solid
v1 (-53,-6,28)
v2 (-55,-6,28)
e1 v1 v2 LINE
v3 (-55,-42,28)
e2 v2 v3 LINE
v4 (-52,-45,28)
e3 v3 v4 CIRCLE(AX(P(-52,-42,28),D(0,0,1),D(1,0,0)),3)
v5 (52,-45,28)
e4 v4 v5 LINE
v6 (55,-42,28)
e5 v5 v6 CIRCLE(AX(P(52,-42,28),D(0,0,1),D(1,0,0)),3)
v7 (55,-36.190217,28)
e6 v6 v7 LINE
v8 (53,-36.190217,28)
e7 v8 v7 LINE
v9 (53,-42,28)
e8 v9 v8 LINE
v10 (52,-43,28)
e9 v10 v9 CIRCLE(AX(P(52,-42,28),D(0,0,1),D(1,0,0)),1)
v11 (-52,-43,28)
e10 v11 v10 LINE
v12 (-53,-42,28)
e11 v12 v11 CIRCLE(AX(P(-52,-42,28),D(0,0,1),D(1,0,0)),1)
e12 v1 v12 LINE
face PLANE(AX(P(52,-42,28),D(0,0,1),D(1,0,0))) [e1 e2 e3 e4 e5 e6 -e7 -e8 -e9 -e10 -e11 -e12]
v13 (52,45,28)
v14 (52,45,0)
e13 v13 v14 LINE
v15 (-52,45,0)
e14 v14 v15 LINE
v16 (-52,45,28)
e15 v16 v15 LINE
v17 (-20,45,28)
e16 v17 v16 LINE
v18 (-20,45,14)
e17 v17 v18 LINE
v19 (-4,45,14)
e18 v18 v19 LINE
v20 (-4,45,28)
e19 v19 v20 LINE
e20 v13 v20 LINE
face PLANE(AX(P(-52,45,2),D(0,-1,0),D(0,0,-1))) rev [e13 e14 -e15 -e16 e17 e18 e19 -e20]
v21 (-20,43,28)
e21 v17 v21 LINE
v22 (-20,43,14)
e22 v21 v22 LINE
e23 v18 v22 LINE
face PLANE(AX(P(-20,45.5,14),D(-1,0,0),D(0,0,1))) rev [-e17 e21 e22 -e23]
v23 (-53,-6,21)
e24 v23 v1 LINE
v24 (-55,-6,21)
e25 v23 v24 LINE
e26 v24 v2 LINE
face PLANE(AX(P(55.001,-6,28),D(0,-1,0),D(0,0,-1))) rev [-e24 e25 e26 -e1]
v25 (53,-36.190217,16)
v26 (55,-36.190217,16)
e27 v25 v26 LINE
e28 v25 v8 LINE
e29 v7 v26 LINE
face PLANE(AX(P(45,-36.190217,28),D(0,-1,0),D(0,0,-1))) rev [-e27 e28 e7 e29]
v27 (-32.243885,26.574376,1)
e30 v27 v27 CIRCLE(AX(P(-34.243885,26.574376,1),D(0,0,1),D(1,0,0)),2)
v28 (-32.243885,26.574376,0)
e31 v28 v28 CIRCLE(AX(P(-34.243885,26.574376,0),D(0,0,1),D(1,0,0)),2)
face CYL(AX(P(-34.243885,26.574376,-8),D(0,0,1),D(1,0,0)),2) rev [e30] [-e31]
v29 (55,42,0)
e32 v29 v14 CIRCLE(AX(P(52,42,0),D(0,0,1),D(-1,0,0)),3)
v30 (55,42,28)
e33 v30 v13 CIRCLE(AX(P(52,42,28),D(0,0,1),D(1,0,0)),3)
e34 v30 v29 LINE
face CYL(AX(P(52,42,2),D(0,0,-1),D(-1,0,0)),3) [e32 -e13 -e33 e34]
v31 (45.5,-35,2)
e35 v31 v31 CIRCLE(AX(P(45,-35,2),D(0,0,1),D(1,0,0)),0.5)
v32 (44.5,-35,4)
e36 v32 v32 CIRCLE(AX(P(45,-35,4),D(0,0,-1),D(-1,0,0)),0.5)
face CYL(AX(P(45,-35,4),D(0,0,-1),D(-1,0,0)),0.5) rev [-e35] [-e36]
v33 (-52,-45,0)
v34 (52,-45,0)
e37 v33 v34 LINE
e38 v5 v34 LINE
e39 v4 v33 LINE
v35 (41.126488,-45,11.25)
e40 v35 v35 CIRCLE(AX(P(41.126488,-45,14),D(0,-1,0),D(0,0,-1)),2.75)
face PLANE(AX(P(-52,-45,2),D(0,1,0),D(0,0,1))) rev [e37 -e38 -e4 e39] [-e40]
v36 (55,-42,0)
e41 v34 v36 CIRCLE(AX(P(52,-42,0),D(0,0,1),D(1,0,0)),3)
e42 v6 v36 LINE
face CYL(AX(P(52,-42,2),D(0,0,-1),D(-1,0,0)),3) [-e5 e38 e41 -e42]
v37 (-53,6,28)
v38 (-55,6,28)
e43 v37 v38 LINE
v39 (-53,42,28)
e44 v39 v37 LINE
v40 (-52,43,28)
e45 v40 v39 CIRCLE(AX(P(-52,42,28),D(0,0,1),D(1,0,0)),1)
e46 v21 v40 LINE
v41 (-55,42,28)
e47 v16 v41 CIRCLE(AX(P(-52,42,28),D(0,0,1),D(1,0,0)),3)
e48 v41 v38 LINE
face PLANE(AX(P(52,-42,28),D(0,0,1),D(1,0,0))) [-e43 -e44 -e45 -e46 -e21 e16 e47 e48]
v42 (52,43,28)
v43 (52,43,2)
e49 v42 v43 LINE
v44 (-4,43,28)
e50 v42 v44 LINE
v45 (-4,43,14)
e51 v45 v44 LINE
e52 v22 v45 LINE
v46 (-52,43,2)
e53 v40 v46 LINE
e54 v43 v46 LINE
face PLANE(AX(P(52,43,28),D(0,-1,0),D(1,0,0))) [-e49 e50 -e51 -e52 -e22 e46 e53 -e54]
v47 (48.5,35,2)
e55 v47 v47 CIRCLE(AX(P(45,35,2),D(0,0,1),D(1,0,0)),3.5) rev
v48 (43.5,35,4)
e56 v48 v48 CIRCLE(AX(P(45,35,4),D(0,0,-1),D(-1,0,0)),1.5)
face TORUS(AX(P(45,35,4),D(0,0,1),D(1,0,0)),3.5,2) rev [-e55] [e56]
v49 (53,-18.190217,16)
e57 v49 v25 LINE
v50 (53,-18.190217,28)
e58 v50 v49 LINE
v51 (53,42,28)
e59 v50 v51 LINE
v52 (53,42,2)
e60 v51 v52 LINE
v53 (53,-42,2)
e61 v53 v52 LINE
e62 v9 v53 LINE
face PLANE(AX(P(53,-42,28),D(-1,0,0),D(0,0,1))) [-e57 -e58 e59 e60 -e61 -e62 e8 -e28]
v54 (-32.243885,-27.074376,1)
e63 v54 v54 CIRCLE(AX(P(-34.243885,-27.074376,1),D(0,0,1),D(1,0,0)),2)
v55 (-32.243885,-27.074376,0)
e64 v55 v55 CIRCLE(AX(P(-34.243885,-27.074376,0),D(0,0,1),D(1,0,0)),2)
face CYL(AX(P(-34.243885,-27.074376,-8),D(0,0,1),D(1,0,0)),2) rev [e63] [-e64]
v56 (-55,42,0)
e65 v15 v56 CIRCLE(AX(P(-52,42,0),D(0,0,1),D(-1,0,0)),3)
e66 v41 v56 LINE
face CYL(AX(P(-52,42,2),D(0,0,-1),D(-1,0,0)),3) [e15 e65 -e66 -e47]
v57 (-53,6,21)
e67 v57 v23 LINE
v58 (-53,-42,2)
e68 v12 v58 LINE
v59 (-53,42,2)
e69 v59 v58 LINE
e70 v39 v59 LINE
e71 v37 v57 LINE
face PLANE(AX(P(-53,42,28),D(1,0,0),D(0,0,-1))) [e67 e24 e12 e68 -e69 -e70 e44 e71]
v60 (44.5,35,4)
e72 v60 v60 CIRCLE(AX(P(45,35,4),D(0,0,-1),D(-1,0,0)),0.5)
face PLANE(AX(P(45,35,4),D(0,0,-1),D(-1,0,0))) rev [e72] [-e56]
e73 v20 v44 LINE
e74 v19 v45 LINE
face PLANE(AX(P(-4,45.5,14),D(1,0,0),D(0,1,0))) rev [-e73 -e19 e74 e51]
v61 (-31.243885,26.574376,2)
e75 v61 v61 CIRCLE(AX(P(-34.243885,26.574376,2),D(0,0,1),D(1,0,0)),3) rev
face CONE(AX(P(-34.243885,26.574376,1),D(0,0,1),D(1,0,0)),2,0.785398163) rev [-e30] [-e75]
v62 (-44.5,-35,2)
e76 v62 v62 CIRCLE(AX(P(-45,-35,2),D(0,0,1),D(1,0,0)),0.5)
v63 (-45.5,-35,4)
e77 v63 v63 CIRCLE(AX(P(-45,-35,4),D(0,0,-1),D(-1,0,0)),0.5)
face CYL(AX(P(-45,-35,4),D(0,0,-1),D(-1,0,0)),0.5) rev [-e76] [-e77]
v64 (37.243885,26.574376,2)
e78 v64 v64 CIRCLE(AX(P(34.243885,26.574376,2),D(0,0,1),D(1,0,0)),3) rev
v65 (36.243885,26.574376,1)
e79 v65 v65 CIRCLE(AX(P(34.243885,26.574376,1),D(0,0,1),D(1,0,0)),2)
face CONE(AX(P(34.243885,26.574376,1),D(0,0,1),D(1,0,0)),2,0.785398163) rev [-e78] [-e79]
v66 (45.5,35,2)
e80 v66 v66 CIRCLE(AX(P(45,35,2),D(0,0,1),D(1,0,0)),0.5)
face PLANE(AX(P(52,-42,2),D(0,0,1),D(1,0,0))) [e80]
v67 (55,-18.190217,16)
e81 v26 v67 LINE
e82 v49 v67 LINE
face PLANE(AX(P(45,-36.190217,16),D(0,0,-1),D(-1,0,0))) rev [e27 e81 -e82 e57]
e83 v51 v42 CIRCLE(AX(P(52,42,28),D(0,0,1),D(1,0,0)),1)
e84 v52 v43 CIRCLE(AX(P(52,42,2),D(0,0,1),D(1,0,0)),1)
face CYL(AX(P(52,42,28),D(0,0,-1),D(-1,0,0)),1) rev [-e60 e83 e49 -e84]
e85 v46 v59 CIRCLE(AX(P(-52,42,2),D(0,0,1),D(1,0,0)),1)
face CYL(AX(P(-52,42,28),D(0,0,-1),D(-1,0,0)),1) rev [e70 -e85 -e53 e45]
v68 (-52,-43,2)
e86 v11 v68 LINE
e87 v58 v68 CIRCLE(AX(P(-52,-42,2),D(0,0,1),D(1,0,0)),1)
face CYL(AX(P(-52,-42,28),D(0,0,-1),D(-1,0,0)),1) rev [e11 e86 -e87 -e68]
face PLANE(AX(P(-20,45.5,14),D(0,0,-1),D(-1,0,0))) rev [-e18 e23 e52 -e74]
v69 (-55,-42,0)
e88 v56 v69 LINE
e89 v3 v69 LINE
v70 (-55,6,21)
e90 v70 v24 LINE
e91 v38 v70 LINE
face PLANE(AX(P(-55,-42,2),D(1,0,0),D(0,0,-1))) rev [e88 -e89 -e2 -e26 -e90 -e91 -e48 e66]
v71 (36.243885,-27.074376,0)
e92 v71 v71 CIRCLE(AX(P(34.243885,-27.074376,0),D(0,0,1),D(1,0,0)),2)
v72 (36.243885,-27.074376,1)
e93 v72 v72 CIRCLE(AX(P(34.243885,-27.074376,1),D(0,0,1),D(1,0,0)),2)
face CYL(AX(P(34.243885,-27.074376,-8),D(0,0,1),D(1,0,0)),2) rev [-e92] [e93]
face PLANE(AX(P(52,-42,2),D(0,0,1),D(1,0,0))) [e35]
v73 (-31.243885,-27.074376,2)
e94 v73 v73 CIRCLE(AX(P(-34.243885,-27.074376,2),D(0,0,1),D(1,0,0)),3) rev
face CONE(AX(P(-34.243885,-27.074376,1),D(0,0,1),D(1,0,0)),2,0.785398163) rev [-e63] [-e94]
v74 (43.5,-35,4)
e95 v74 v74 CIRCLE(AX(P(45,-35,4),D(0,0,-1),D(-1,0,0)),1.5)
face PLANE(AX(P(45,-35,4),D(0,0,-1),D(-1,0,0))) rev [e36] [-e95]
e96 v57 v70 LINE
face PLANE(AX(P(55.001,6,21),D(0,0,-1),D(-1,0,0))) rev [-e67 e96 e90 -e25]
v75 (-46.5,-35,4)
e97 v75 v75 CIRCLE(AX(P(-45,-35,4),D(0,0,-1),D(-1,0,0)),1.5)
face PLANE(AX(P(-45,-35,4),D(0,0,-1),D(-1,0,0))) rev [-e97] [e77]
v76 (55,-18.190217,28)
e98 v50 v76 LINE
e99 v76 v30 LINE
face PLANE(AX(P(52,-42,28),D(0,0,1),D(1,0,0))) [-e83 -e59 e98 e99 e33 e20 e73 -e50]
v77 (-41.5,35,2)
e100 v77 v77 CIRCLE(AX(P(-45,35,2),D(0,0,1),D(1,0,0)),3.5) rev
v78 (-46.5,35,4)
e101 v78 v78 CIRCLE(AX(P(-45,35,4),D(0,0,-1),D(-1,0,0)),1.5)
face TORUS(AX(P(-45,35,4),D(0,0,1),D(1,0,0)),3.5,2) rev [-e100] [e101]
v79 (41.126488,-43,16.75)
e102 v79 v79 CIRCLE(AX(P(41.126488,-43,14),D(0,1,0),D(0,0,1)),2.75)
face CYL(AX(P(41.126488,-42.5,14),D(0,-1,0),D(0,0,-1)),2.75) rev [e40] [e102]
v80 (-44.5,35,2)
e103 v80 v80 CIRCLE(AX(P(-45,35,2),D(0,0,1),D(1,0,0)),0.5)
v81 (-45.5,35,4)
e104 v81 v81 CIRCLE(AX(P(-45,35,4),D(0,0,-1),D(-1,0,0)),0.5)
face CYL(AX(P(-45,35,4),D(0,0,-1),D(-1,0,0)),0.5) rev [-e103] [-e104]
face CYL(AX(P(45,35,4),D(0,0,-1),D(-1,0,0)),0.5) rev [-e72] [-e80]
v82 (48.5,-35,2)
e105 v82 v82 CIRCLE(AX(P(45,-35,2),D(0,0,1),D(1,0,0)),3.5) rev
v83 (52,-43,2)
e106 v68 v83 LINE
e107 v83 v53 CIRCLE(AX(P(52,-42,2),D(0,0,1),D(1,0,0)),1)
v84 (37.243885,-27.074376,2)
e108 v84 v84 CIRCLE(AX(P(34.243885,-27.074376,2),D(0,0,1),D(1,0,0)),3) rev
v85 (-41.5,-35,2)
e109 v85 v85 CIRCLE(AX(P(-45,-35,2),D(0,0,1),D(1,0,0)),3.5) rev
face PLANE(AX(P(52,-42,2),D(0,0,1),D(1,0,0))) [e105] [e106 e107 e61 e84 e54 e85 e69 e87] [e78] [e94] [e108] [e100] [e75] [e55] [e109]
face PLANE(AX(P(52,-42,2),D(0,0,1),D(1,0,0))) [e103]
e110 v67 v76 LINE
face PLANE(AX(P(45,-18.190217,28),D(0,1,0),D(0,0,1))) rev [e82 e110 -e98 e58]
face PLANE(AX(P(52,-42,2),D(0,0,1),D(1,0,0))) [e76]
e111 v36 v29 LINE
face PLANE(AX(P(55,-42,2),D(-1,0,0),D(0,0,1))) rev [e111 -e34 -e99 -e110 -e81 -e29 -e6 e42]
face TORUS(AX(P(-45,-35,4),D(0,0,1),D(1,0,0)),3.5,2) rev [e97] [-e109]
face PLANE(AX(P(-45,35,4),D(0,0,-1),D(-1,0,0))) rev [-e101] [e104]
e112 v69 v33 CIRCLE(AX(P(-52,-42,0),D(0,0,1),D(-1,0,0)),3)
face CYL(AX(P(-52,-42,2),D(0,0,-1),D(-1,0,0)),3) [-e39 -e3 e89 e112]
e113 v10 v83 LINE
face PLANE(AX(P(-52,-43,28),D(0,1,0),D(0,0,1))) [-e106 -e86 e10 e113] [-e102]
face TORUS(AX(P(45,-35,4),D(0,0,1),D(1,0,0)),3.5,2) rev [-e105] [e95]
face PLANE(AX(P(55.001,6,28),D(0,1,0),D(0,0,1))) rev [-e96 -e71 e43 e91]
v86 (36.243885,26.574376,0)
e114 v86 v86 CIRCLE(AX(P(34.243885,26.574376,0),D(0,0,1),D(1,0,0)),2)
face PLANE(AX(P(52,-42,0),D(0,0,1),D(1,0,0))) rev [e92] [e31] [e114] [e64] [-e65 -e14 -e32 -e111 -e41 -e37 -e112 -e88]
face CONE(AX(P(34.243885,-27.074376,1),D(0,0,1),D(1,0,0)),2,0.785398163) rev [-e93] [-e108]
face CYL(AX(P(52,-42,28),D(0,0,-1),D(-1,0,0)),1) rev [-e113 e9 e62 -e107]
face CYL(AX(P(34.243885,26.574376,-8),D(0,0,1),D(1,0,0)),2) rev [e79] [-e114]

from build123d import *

# Parameters (mm, degrees)
BOSS_EXTRUDE1_DEPTH = 2
BOSS_EXTRUDE2_DEPTH = 26
SKETCH5_R           = 1.5
SKETCH5_R_2         = 0.5
BOSS_EXTRUDE4_DEPTH = 4
FILLET2_R           = 2
SKETCH9_W           = 16
SKETCH9_H           = 14
CUT_EXTRUDE3_DEPTH  = 2.5
SKETCH11_R          = 2.75
CUT_EXTRUDE5_DEPTH  = 2.5
CUT_EXTRUDE6_REACH  = 124.102
SKETCH12_W          = 7
SKETCH12_H          = 12
SKETCH13_W          = 12
SKETCH13_H          = 18
CUT_EXTRUDE7_DEPTH  = 10
SKETCH14_R          = 2
CUT_EXTRUDE8_DEPTH  = 10
CHAMFER1_SIZE       = 1


with BuildPart() as part:
    # Sketch2 → Boss-Extrude1 (new body)
    with BuildSketch(Plane.XY):
        with BuildLine():
            Line((-52, -45), (52, -45))
            ThreePointArc((52, -45), (54.121320344, -44.121320344), (55, -42))
            Line((55, -42), (55, 42))
            ThreePointArc((55, 42), (54.121320344, 44.121320344), (52, 45))
            Line((52, 45), (-52, 45))
            ThreePointArc((-52, 45), (-54.121320344, 44.121320344), (-55, 42))
            Line((-55, 42), (-55, -42))
            ThreePointArc((-55, -42), (-54.121320344, -44.121320344), (-52, -45))
        make_face()
    extrude(amount=BOSS_EXTRUDE1_DEPTH)

    # Sketch3 → Boss-Extrude2 (add)
    with BuildSketch(Plane.XY.offset(2)):
        with BuildLine():
            Line((55, -42), (55, 42))
            ThreePointArc((55, 42), (54.121320344, 44.121320344), (52, 45))
            Line((52, 45), (-52, 45))
            ThreePointArc((-52, 45), (-54.121320344, 44.121320344), (-55, 42))
            Line((-55, 42), (-55, -42))
            ThreePointArc((-55, -42), (-54.121320344, -44.121320344), (-52, -45))
            Line((-52, -45), (52, -45))
            ThreePointArc((52, -45), (54.121320344, -44.121320344), (55, -42))
        make_face()
        with BuildLine():
            Line((52, 43), (-52, 43))
            ThreePointArc((-52, 43), (-52.707106781, 42.707106781), (-53, 42))
            Line((-53, 42), (-53, -42))
            ThreePointArc((-53, -42), (-52.707106781, -42.707106781), (-52, -43))
            Line((-52, -43), (52, -43))
            ThreePointArc((52, -43), (52.707106781, -42.707106781), (53, -42))
            Line((53, -42), (53, 42))
            ThreePointArc((53, 42), (52.707106781, 42.707106781), (52, 43))
        make_face(mode=Mode.SUBTRACT)
    extrude(amount=BOSS_EXTRUDE2_DEPTH)

    # Sketch5 → Boss-Extrude4 (add)
    # profile 1 of 4: a face of its own
    with BuildSketch(Plane(origin=(0, 0, 0), x_dir=(-1, 0, 0), z_dir=(0, 0, -1))):
        with Locations((45, 35)):
            Circle(SKETCH5_R)
        with Locations((45, 35)):
            Circle(SKETCH5_R_2, mode=Mode.SUBTRACT)
    # profile 2 of 4: a face of its own
    with BuildSketch(Plane(origin=(0, 0, 0), x_dir=(-1, 0, 0), z_dir=(0, 0, -1))):
        with Locations((-45, 35)):
            Circle(SKETCH5_R)
        with Locations((-45, 35)):
            Circle(SKETCH5_R_2, mode=Mode.SUBTRACT)
    # profile 3 of 4: a face of its own
    with BuildSketch(Plane(origin=(0, 0, 0), x_dir=(-1, 0, 0), z_dir=(0, 0, -1))):
        with Locations((-45, -35)):
            Circle(SKETCH5_R)
        with Locations((-45, -35)):
            Circle(SKETCH5_R_2, mode=Mode.SUBTRACT)
    # profile 4 of 4: a face of its own
    with BuildSketch(Plane(origin=(0, 0, 0), x_dir=(-1, 0, 0), z_dir=(0, 0, -1))):
        with Locations((45, -35)):
            Circle(SKETCH5_R)
        with Locations((45, -35)):
            Circle(SKETCH5_R_2, mode=Mode.SUBTRACT)
    extrude(amount=-BOSS_EXTRUDE4_DEPTH)

    # Fillet2
    fillet2_edges = [part.edges().sort_by_distance(p)[0] for p in [
        (46.5, 35, 2),
        (46.5, -35, 2),
        (-43.5, -35, 2),
        (-43.5, 35, 2),
    ]]
    fillet(fillet2_edges, radius=FILLET2_R - 0.0001)  # a hair under: the kernel refuses the full size

    # Sketch9 → Cut-Extrude3 (cut)
    with BuildSketch(Plane(origin=(0, 43, 0), x_dir=(-1, 0, 0), z_dir=(0, -1, 0))):
        with Locations((12, -21)):
            Rectangle(SKETCH9_W, SKETCH9_H)
    extrude(amount=-CUT_EXTRUDE3_DEPTH, mode=Mode.SUBTRACT)

    # Sketch11 → Cut-Extrude5 (cut)
    with BuildSketch(Plane(origin=(0, -45, 0), x_dir=(-1, 0, 0), z_dir=(0, -1, 0))):
        with Locations(Location((-41.126488164, -14, 0), (0, 0, 90))):
            Circle(SKETCH11_R)
    extrude(amount=-CUT_EXTRUDE5_DEPTH, mode=Mode.SUBTRACT)

    # Sketch12 → Cut-Extrude6 (cut, up to next)
    with BuildSketch(Plane.ZY.offset(55), mode=Mode.PRIVATE) as cut_extrude6_sk1:
        with Locations((24.5, 0)):
            Rectangle(SKETCH12_W, SKETCH12_H)
    cut_extrude6_tool1 = extrude(cut_extrude6_sk1.sketch, amount=-CUT_EXTRUDE6_REACH, mode=Mode.PRIVATE) & part.part
    add(cut_extrude6_tool1.solids().sort_by_distance((-55, 0, 24.5))[0], mode=Mode.SUBTRACT)

    # Sketch13 → Cut-Extrude7 (cut)
    with BuildSketch(Plane(origin=(55, 0, 0), x_dir=(0, 0, -1), z_dir=(1, 0, 0))):
        with Locations((-22, -27.190217321)):
            Rectangle(SKETCH13_W, SKETCH13_H)
    extrude(amount=-CUT_EXTRUDE7_DEPTH, mode=Mode.SUBTRACT)

    # Sketch14 → Cut-Extrude8 (cut)
    with BuildSketch(Plane.XY.offset(2)):
        with Locations((-34.243884653, -27.074376311)):
            Circle(SKETCH14_R)
        with Locations((34.243884653, 26.574376311)):
            Circle(SKETCH14_R)
        with Locations((34.243884653, -27.074376311)):
            Circle(SKETCH14_R)
        with Locations((-34.243884653, 26.574376311)):
            Circle(SKETCH14_R)
    extrude(amount=-CUT_EXTRUDE8_DEPTH, mode=Mode.SUBTRACT)

    # Chamfer1
    chamfer1_edges = [part.edges().sort_by_distance(p)[0] for p in [
        (-36.243884653, 26.574376311, 2),
        (32.243884653, -27.074376311, 2),
        (32.243884653, 26.574376311, 2),
        (-36.243884653, -27.074376311, 2),
    ]]
    chamfer(chamfer1_edges, length=CHAMFER1_SIZE)


solid = part.part
